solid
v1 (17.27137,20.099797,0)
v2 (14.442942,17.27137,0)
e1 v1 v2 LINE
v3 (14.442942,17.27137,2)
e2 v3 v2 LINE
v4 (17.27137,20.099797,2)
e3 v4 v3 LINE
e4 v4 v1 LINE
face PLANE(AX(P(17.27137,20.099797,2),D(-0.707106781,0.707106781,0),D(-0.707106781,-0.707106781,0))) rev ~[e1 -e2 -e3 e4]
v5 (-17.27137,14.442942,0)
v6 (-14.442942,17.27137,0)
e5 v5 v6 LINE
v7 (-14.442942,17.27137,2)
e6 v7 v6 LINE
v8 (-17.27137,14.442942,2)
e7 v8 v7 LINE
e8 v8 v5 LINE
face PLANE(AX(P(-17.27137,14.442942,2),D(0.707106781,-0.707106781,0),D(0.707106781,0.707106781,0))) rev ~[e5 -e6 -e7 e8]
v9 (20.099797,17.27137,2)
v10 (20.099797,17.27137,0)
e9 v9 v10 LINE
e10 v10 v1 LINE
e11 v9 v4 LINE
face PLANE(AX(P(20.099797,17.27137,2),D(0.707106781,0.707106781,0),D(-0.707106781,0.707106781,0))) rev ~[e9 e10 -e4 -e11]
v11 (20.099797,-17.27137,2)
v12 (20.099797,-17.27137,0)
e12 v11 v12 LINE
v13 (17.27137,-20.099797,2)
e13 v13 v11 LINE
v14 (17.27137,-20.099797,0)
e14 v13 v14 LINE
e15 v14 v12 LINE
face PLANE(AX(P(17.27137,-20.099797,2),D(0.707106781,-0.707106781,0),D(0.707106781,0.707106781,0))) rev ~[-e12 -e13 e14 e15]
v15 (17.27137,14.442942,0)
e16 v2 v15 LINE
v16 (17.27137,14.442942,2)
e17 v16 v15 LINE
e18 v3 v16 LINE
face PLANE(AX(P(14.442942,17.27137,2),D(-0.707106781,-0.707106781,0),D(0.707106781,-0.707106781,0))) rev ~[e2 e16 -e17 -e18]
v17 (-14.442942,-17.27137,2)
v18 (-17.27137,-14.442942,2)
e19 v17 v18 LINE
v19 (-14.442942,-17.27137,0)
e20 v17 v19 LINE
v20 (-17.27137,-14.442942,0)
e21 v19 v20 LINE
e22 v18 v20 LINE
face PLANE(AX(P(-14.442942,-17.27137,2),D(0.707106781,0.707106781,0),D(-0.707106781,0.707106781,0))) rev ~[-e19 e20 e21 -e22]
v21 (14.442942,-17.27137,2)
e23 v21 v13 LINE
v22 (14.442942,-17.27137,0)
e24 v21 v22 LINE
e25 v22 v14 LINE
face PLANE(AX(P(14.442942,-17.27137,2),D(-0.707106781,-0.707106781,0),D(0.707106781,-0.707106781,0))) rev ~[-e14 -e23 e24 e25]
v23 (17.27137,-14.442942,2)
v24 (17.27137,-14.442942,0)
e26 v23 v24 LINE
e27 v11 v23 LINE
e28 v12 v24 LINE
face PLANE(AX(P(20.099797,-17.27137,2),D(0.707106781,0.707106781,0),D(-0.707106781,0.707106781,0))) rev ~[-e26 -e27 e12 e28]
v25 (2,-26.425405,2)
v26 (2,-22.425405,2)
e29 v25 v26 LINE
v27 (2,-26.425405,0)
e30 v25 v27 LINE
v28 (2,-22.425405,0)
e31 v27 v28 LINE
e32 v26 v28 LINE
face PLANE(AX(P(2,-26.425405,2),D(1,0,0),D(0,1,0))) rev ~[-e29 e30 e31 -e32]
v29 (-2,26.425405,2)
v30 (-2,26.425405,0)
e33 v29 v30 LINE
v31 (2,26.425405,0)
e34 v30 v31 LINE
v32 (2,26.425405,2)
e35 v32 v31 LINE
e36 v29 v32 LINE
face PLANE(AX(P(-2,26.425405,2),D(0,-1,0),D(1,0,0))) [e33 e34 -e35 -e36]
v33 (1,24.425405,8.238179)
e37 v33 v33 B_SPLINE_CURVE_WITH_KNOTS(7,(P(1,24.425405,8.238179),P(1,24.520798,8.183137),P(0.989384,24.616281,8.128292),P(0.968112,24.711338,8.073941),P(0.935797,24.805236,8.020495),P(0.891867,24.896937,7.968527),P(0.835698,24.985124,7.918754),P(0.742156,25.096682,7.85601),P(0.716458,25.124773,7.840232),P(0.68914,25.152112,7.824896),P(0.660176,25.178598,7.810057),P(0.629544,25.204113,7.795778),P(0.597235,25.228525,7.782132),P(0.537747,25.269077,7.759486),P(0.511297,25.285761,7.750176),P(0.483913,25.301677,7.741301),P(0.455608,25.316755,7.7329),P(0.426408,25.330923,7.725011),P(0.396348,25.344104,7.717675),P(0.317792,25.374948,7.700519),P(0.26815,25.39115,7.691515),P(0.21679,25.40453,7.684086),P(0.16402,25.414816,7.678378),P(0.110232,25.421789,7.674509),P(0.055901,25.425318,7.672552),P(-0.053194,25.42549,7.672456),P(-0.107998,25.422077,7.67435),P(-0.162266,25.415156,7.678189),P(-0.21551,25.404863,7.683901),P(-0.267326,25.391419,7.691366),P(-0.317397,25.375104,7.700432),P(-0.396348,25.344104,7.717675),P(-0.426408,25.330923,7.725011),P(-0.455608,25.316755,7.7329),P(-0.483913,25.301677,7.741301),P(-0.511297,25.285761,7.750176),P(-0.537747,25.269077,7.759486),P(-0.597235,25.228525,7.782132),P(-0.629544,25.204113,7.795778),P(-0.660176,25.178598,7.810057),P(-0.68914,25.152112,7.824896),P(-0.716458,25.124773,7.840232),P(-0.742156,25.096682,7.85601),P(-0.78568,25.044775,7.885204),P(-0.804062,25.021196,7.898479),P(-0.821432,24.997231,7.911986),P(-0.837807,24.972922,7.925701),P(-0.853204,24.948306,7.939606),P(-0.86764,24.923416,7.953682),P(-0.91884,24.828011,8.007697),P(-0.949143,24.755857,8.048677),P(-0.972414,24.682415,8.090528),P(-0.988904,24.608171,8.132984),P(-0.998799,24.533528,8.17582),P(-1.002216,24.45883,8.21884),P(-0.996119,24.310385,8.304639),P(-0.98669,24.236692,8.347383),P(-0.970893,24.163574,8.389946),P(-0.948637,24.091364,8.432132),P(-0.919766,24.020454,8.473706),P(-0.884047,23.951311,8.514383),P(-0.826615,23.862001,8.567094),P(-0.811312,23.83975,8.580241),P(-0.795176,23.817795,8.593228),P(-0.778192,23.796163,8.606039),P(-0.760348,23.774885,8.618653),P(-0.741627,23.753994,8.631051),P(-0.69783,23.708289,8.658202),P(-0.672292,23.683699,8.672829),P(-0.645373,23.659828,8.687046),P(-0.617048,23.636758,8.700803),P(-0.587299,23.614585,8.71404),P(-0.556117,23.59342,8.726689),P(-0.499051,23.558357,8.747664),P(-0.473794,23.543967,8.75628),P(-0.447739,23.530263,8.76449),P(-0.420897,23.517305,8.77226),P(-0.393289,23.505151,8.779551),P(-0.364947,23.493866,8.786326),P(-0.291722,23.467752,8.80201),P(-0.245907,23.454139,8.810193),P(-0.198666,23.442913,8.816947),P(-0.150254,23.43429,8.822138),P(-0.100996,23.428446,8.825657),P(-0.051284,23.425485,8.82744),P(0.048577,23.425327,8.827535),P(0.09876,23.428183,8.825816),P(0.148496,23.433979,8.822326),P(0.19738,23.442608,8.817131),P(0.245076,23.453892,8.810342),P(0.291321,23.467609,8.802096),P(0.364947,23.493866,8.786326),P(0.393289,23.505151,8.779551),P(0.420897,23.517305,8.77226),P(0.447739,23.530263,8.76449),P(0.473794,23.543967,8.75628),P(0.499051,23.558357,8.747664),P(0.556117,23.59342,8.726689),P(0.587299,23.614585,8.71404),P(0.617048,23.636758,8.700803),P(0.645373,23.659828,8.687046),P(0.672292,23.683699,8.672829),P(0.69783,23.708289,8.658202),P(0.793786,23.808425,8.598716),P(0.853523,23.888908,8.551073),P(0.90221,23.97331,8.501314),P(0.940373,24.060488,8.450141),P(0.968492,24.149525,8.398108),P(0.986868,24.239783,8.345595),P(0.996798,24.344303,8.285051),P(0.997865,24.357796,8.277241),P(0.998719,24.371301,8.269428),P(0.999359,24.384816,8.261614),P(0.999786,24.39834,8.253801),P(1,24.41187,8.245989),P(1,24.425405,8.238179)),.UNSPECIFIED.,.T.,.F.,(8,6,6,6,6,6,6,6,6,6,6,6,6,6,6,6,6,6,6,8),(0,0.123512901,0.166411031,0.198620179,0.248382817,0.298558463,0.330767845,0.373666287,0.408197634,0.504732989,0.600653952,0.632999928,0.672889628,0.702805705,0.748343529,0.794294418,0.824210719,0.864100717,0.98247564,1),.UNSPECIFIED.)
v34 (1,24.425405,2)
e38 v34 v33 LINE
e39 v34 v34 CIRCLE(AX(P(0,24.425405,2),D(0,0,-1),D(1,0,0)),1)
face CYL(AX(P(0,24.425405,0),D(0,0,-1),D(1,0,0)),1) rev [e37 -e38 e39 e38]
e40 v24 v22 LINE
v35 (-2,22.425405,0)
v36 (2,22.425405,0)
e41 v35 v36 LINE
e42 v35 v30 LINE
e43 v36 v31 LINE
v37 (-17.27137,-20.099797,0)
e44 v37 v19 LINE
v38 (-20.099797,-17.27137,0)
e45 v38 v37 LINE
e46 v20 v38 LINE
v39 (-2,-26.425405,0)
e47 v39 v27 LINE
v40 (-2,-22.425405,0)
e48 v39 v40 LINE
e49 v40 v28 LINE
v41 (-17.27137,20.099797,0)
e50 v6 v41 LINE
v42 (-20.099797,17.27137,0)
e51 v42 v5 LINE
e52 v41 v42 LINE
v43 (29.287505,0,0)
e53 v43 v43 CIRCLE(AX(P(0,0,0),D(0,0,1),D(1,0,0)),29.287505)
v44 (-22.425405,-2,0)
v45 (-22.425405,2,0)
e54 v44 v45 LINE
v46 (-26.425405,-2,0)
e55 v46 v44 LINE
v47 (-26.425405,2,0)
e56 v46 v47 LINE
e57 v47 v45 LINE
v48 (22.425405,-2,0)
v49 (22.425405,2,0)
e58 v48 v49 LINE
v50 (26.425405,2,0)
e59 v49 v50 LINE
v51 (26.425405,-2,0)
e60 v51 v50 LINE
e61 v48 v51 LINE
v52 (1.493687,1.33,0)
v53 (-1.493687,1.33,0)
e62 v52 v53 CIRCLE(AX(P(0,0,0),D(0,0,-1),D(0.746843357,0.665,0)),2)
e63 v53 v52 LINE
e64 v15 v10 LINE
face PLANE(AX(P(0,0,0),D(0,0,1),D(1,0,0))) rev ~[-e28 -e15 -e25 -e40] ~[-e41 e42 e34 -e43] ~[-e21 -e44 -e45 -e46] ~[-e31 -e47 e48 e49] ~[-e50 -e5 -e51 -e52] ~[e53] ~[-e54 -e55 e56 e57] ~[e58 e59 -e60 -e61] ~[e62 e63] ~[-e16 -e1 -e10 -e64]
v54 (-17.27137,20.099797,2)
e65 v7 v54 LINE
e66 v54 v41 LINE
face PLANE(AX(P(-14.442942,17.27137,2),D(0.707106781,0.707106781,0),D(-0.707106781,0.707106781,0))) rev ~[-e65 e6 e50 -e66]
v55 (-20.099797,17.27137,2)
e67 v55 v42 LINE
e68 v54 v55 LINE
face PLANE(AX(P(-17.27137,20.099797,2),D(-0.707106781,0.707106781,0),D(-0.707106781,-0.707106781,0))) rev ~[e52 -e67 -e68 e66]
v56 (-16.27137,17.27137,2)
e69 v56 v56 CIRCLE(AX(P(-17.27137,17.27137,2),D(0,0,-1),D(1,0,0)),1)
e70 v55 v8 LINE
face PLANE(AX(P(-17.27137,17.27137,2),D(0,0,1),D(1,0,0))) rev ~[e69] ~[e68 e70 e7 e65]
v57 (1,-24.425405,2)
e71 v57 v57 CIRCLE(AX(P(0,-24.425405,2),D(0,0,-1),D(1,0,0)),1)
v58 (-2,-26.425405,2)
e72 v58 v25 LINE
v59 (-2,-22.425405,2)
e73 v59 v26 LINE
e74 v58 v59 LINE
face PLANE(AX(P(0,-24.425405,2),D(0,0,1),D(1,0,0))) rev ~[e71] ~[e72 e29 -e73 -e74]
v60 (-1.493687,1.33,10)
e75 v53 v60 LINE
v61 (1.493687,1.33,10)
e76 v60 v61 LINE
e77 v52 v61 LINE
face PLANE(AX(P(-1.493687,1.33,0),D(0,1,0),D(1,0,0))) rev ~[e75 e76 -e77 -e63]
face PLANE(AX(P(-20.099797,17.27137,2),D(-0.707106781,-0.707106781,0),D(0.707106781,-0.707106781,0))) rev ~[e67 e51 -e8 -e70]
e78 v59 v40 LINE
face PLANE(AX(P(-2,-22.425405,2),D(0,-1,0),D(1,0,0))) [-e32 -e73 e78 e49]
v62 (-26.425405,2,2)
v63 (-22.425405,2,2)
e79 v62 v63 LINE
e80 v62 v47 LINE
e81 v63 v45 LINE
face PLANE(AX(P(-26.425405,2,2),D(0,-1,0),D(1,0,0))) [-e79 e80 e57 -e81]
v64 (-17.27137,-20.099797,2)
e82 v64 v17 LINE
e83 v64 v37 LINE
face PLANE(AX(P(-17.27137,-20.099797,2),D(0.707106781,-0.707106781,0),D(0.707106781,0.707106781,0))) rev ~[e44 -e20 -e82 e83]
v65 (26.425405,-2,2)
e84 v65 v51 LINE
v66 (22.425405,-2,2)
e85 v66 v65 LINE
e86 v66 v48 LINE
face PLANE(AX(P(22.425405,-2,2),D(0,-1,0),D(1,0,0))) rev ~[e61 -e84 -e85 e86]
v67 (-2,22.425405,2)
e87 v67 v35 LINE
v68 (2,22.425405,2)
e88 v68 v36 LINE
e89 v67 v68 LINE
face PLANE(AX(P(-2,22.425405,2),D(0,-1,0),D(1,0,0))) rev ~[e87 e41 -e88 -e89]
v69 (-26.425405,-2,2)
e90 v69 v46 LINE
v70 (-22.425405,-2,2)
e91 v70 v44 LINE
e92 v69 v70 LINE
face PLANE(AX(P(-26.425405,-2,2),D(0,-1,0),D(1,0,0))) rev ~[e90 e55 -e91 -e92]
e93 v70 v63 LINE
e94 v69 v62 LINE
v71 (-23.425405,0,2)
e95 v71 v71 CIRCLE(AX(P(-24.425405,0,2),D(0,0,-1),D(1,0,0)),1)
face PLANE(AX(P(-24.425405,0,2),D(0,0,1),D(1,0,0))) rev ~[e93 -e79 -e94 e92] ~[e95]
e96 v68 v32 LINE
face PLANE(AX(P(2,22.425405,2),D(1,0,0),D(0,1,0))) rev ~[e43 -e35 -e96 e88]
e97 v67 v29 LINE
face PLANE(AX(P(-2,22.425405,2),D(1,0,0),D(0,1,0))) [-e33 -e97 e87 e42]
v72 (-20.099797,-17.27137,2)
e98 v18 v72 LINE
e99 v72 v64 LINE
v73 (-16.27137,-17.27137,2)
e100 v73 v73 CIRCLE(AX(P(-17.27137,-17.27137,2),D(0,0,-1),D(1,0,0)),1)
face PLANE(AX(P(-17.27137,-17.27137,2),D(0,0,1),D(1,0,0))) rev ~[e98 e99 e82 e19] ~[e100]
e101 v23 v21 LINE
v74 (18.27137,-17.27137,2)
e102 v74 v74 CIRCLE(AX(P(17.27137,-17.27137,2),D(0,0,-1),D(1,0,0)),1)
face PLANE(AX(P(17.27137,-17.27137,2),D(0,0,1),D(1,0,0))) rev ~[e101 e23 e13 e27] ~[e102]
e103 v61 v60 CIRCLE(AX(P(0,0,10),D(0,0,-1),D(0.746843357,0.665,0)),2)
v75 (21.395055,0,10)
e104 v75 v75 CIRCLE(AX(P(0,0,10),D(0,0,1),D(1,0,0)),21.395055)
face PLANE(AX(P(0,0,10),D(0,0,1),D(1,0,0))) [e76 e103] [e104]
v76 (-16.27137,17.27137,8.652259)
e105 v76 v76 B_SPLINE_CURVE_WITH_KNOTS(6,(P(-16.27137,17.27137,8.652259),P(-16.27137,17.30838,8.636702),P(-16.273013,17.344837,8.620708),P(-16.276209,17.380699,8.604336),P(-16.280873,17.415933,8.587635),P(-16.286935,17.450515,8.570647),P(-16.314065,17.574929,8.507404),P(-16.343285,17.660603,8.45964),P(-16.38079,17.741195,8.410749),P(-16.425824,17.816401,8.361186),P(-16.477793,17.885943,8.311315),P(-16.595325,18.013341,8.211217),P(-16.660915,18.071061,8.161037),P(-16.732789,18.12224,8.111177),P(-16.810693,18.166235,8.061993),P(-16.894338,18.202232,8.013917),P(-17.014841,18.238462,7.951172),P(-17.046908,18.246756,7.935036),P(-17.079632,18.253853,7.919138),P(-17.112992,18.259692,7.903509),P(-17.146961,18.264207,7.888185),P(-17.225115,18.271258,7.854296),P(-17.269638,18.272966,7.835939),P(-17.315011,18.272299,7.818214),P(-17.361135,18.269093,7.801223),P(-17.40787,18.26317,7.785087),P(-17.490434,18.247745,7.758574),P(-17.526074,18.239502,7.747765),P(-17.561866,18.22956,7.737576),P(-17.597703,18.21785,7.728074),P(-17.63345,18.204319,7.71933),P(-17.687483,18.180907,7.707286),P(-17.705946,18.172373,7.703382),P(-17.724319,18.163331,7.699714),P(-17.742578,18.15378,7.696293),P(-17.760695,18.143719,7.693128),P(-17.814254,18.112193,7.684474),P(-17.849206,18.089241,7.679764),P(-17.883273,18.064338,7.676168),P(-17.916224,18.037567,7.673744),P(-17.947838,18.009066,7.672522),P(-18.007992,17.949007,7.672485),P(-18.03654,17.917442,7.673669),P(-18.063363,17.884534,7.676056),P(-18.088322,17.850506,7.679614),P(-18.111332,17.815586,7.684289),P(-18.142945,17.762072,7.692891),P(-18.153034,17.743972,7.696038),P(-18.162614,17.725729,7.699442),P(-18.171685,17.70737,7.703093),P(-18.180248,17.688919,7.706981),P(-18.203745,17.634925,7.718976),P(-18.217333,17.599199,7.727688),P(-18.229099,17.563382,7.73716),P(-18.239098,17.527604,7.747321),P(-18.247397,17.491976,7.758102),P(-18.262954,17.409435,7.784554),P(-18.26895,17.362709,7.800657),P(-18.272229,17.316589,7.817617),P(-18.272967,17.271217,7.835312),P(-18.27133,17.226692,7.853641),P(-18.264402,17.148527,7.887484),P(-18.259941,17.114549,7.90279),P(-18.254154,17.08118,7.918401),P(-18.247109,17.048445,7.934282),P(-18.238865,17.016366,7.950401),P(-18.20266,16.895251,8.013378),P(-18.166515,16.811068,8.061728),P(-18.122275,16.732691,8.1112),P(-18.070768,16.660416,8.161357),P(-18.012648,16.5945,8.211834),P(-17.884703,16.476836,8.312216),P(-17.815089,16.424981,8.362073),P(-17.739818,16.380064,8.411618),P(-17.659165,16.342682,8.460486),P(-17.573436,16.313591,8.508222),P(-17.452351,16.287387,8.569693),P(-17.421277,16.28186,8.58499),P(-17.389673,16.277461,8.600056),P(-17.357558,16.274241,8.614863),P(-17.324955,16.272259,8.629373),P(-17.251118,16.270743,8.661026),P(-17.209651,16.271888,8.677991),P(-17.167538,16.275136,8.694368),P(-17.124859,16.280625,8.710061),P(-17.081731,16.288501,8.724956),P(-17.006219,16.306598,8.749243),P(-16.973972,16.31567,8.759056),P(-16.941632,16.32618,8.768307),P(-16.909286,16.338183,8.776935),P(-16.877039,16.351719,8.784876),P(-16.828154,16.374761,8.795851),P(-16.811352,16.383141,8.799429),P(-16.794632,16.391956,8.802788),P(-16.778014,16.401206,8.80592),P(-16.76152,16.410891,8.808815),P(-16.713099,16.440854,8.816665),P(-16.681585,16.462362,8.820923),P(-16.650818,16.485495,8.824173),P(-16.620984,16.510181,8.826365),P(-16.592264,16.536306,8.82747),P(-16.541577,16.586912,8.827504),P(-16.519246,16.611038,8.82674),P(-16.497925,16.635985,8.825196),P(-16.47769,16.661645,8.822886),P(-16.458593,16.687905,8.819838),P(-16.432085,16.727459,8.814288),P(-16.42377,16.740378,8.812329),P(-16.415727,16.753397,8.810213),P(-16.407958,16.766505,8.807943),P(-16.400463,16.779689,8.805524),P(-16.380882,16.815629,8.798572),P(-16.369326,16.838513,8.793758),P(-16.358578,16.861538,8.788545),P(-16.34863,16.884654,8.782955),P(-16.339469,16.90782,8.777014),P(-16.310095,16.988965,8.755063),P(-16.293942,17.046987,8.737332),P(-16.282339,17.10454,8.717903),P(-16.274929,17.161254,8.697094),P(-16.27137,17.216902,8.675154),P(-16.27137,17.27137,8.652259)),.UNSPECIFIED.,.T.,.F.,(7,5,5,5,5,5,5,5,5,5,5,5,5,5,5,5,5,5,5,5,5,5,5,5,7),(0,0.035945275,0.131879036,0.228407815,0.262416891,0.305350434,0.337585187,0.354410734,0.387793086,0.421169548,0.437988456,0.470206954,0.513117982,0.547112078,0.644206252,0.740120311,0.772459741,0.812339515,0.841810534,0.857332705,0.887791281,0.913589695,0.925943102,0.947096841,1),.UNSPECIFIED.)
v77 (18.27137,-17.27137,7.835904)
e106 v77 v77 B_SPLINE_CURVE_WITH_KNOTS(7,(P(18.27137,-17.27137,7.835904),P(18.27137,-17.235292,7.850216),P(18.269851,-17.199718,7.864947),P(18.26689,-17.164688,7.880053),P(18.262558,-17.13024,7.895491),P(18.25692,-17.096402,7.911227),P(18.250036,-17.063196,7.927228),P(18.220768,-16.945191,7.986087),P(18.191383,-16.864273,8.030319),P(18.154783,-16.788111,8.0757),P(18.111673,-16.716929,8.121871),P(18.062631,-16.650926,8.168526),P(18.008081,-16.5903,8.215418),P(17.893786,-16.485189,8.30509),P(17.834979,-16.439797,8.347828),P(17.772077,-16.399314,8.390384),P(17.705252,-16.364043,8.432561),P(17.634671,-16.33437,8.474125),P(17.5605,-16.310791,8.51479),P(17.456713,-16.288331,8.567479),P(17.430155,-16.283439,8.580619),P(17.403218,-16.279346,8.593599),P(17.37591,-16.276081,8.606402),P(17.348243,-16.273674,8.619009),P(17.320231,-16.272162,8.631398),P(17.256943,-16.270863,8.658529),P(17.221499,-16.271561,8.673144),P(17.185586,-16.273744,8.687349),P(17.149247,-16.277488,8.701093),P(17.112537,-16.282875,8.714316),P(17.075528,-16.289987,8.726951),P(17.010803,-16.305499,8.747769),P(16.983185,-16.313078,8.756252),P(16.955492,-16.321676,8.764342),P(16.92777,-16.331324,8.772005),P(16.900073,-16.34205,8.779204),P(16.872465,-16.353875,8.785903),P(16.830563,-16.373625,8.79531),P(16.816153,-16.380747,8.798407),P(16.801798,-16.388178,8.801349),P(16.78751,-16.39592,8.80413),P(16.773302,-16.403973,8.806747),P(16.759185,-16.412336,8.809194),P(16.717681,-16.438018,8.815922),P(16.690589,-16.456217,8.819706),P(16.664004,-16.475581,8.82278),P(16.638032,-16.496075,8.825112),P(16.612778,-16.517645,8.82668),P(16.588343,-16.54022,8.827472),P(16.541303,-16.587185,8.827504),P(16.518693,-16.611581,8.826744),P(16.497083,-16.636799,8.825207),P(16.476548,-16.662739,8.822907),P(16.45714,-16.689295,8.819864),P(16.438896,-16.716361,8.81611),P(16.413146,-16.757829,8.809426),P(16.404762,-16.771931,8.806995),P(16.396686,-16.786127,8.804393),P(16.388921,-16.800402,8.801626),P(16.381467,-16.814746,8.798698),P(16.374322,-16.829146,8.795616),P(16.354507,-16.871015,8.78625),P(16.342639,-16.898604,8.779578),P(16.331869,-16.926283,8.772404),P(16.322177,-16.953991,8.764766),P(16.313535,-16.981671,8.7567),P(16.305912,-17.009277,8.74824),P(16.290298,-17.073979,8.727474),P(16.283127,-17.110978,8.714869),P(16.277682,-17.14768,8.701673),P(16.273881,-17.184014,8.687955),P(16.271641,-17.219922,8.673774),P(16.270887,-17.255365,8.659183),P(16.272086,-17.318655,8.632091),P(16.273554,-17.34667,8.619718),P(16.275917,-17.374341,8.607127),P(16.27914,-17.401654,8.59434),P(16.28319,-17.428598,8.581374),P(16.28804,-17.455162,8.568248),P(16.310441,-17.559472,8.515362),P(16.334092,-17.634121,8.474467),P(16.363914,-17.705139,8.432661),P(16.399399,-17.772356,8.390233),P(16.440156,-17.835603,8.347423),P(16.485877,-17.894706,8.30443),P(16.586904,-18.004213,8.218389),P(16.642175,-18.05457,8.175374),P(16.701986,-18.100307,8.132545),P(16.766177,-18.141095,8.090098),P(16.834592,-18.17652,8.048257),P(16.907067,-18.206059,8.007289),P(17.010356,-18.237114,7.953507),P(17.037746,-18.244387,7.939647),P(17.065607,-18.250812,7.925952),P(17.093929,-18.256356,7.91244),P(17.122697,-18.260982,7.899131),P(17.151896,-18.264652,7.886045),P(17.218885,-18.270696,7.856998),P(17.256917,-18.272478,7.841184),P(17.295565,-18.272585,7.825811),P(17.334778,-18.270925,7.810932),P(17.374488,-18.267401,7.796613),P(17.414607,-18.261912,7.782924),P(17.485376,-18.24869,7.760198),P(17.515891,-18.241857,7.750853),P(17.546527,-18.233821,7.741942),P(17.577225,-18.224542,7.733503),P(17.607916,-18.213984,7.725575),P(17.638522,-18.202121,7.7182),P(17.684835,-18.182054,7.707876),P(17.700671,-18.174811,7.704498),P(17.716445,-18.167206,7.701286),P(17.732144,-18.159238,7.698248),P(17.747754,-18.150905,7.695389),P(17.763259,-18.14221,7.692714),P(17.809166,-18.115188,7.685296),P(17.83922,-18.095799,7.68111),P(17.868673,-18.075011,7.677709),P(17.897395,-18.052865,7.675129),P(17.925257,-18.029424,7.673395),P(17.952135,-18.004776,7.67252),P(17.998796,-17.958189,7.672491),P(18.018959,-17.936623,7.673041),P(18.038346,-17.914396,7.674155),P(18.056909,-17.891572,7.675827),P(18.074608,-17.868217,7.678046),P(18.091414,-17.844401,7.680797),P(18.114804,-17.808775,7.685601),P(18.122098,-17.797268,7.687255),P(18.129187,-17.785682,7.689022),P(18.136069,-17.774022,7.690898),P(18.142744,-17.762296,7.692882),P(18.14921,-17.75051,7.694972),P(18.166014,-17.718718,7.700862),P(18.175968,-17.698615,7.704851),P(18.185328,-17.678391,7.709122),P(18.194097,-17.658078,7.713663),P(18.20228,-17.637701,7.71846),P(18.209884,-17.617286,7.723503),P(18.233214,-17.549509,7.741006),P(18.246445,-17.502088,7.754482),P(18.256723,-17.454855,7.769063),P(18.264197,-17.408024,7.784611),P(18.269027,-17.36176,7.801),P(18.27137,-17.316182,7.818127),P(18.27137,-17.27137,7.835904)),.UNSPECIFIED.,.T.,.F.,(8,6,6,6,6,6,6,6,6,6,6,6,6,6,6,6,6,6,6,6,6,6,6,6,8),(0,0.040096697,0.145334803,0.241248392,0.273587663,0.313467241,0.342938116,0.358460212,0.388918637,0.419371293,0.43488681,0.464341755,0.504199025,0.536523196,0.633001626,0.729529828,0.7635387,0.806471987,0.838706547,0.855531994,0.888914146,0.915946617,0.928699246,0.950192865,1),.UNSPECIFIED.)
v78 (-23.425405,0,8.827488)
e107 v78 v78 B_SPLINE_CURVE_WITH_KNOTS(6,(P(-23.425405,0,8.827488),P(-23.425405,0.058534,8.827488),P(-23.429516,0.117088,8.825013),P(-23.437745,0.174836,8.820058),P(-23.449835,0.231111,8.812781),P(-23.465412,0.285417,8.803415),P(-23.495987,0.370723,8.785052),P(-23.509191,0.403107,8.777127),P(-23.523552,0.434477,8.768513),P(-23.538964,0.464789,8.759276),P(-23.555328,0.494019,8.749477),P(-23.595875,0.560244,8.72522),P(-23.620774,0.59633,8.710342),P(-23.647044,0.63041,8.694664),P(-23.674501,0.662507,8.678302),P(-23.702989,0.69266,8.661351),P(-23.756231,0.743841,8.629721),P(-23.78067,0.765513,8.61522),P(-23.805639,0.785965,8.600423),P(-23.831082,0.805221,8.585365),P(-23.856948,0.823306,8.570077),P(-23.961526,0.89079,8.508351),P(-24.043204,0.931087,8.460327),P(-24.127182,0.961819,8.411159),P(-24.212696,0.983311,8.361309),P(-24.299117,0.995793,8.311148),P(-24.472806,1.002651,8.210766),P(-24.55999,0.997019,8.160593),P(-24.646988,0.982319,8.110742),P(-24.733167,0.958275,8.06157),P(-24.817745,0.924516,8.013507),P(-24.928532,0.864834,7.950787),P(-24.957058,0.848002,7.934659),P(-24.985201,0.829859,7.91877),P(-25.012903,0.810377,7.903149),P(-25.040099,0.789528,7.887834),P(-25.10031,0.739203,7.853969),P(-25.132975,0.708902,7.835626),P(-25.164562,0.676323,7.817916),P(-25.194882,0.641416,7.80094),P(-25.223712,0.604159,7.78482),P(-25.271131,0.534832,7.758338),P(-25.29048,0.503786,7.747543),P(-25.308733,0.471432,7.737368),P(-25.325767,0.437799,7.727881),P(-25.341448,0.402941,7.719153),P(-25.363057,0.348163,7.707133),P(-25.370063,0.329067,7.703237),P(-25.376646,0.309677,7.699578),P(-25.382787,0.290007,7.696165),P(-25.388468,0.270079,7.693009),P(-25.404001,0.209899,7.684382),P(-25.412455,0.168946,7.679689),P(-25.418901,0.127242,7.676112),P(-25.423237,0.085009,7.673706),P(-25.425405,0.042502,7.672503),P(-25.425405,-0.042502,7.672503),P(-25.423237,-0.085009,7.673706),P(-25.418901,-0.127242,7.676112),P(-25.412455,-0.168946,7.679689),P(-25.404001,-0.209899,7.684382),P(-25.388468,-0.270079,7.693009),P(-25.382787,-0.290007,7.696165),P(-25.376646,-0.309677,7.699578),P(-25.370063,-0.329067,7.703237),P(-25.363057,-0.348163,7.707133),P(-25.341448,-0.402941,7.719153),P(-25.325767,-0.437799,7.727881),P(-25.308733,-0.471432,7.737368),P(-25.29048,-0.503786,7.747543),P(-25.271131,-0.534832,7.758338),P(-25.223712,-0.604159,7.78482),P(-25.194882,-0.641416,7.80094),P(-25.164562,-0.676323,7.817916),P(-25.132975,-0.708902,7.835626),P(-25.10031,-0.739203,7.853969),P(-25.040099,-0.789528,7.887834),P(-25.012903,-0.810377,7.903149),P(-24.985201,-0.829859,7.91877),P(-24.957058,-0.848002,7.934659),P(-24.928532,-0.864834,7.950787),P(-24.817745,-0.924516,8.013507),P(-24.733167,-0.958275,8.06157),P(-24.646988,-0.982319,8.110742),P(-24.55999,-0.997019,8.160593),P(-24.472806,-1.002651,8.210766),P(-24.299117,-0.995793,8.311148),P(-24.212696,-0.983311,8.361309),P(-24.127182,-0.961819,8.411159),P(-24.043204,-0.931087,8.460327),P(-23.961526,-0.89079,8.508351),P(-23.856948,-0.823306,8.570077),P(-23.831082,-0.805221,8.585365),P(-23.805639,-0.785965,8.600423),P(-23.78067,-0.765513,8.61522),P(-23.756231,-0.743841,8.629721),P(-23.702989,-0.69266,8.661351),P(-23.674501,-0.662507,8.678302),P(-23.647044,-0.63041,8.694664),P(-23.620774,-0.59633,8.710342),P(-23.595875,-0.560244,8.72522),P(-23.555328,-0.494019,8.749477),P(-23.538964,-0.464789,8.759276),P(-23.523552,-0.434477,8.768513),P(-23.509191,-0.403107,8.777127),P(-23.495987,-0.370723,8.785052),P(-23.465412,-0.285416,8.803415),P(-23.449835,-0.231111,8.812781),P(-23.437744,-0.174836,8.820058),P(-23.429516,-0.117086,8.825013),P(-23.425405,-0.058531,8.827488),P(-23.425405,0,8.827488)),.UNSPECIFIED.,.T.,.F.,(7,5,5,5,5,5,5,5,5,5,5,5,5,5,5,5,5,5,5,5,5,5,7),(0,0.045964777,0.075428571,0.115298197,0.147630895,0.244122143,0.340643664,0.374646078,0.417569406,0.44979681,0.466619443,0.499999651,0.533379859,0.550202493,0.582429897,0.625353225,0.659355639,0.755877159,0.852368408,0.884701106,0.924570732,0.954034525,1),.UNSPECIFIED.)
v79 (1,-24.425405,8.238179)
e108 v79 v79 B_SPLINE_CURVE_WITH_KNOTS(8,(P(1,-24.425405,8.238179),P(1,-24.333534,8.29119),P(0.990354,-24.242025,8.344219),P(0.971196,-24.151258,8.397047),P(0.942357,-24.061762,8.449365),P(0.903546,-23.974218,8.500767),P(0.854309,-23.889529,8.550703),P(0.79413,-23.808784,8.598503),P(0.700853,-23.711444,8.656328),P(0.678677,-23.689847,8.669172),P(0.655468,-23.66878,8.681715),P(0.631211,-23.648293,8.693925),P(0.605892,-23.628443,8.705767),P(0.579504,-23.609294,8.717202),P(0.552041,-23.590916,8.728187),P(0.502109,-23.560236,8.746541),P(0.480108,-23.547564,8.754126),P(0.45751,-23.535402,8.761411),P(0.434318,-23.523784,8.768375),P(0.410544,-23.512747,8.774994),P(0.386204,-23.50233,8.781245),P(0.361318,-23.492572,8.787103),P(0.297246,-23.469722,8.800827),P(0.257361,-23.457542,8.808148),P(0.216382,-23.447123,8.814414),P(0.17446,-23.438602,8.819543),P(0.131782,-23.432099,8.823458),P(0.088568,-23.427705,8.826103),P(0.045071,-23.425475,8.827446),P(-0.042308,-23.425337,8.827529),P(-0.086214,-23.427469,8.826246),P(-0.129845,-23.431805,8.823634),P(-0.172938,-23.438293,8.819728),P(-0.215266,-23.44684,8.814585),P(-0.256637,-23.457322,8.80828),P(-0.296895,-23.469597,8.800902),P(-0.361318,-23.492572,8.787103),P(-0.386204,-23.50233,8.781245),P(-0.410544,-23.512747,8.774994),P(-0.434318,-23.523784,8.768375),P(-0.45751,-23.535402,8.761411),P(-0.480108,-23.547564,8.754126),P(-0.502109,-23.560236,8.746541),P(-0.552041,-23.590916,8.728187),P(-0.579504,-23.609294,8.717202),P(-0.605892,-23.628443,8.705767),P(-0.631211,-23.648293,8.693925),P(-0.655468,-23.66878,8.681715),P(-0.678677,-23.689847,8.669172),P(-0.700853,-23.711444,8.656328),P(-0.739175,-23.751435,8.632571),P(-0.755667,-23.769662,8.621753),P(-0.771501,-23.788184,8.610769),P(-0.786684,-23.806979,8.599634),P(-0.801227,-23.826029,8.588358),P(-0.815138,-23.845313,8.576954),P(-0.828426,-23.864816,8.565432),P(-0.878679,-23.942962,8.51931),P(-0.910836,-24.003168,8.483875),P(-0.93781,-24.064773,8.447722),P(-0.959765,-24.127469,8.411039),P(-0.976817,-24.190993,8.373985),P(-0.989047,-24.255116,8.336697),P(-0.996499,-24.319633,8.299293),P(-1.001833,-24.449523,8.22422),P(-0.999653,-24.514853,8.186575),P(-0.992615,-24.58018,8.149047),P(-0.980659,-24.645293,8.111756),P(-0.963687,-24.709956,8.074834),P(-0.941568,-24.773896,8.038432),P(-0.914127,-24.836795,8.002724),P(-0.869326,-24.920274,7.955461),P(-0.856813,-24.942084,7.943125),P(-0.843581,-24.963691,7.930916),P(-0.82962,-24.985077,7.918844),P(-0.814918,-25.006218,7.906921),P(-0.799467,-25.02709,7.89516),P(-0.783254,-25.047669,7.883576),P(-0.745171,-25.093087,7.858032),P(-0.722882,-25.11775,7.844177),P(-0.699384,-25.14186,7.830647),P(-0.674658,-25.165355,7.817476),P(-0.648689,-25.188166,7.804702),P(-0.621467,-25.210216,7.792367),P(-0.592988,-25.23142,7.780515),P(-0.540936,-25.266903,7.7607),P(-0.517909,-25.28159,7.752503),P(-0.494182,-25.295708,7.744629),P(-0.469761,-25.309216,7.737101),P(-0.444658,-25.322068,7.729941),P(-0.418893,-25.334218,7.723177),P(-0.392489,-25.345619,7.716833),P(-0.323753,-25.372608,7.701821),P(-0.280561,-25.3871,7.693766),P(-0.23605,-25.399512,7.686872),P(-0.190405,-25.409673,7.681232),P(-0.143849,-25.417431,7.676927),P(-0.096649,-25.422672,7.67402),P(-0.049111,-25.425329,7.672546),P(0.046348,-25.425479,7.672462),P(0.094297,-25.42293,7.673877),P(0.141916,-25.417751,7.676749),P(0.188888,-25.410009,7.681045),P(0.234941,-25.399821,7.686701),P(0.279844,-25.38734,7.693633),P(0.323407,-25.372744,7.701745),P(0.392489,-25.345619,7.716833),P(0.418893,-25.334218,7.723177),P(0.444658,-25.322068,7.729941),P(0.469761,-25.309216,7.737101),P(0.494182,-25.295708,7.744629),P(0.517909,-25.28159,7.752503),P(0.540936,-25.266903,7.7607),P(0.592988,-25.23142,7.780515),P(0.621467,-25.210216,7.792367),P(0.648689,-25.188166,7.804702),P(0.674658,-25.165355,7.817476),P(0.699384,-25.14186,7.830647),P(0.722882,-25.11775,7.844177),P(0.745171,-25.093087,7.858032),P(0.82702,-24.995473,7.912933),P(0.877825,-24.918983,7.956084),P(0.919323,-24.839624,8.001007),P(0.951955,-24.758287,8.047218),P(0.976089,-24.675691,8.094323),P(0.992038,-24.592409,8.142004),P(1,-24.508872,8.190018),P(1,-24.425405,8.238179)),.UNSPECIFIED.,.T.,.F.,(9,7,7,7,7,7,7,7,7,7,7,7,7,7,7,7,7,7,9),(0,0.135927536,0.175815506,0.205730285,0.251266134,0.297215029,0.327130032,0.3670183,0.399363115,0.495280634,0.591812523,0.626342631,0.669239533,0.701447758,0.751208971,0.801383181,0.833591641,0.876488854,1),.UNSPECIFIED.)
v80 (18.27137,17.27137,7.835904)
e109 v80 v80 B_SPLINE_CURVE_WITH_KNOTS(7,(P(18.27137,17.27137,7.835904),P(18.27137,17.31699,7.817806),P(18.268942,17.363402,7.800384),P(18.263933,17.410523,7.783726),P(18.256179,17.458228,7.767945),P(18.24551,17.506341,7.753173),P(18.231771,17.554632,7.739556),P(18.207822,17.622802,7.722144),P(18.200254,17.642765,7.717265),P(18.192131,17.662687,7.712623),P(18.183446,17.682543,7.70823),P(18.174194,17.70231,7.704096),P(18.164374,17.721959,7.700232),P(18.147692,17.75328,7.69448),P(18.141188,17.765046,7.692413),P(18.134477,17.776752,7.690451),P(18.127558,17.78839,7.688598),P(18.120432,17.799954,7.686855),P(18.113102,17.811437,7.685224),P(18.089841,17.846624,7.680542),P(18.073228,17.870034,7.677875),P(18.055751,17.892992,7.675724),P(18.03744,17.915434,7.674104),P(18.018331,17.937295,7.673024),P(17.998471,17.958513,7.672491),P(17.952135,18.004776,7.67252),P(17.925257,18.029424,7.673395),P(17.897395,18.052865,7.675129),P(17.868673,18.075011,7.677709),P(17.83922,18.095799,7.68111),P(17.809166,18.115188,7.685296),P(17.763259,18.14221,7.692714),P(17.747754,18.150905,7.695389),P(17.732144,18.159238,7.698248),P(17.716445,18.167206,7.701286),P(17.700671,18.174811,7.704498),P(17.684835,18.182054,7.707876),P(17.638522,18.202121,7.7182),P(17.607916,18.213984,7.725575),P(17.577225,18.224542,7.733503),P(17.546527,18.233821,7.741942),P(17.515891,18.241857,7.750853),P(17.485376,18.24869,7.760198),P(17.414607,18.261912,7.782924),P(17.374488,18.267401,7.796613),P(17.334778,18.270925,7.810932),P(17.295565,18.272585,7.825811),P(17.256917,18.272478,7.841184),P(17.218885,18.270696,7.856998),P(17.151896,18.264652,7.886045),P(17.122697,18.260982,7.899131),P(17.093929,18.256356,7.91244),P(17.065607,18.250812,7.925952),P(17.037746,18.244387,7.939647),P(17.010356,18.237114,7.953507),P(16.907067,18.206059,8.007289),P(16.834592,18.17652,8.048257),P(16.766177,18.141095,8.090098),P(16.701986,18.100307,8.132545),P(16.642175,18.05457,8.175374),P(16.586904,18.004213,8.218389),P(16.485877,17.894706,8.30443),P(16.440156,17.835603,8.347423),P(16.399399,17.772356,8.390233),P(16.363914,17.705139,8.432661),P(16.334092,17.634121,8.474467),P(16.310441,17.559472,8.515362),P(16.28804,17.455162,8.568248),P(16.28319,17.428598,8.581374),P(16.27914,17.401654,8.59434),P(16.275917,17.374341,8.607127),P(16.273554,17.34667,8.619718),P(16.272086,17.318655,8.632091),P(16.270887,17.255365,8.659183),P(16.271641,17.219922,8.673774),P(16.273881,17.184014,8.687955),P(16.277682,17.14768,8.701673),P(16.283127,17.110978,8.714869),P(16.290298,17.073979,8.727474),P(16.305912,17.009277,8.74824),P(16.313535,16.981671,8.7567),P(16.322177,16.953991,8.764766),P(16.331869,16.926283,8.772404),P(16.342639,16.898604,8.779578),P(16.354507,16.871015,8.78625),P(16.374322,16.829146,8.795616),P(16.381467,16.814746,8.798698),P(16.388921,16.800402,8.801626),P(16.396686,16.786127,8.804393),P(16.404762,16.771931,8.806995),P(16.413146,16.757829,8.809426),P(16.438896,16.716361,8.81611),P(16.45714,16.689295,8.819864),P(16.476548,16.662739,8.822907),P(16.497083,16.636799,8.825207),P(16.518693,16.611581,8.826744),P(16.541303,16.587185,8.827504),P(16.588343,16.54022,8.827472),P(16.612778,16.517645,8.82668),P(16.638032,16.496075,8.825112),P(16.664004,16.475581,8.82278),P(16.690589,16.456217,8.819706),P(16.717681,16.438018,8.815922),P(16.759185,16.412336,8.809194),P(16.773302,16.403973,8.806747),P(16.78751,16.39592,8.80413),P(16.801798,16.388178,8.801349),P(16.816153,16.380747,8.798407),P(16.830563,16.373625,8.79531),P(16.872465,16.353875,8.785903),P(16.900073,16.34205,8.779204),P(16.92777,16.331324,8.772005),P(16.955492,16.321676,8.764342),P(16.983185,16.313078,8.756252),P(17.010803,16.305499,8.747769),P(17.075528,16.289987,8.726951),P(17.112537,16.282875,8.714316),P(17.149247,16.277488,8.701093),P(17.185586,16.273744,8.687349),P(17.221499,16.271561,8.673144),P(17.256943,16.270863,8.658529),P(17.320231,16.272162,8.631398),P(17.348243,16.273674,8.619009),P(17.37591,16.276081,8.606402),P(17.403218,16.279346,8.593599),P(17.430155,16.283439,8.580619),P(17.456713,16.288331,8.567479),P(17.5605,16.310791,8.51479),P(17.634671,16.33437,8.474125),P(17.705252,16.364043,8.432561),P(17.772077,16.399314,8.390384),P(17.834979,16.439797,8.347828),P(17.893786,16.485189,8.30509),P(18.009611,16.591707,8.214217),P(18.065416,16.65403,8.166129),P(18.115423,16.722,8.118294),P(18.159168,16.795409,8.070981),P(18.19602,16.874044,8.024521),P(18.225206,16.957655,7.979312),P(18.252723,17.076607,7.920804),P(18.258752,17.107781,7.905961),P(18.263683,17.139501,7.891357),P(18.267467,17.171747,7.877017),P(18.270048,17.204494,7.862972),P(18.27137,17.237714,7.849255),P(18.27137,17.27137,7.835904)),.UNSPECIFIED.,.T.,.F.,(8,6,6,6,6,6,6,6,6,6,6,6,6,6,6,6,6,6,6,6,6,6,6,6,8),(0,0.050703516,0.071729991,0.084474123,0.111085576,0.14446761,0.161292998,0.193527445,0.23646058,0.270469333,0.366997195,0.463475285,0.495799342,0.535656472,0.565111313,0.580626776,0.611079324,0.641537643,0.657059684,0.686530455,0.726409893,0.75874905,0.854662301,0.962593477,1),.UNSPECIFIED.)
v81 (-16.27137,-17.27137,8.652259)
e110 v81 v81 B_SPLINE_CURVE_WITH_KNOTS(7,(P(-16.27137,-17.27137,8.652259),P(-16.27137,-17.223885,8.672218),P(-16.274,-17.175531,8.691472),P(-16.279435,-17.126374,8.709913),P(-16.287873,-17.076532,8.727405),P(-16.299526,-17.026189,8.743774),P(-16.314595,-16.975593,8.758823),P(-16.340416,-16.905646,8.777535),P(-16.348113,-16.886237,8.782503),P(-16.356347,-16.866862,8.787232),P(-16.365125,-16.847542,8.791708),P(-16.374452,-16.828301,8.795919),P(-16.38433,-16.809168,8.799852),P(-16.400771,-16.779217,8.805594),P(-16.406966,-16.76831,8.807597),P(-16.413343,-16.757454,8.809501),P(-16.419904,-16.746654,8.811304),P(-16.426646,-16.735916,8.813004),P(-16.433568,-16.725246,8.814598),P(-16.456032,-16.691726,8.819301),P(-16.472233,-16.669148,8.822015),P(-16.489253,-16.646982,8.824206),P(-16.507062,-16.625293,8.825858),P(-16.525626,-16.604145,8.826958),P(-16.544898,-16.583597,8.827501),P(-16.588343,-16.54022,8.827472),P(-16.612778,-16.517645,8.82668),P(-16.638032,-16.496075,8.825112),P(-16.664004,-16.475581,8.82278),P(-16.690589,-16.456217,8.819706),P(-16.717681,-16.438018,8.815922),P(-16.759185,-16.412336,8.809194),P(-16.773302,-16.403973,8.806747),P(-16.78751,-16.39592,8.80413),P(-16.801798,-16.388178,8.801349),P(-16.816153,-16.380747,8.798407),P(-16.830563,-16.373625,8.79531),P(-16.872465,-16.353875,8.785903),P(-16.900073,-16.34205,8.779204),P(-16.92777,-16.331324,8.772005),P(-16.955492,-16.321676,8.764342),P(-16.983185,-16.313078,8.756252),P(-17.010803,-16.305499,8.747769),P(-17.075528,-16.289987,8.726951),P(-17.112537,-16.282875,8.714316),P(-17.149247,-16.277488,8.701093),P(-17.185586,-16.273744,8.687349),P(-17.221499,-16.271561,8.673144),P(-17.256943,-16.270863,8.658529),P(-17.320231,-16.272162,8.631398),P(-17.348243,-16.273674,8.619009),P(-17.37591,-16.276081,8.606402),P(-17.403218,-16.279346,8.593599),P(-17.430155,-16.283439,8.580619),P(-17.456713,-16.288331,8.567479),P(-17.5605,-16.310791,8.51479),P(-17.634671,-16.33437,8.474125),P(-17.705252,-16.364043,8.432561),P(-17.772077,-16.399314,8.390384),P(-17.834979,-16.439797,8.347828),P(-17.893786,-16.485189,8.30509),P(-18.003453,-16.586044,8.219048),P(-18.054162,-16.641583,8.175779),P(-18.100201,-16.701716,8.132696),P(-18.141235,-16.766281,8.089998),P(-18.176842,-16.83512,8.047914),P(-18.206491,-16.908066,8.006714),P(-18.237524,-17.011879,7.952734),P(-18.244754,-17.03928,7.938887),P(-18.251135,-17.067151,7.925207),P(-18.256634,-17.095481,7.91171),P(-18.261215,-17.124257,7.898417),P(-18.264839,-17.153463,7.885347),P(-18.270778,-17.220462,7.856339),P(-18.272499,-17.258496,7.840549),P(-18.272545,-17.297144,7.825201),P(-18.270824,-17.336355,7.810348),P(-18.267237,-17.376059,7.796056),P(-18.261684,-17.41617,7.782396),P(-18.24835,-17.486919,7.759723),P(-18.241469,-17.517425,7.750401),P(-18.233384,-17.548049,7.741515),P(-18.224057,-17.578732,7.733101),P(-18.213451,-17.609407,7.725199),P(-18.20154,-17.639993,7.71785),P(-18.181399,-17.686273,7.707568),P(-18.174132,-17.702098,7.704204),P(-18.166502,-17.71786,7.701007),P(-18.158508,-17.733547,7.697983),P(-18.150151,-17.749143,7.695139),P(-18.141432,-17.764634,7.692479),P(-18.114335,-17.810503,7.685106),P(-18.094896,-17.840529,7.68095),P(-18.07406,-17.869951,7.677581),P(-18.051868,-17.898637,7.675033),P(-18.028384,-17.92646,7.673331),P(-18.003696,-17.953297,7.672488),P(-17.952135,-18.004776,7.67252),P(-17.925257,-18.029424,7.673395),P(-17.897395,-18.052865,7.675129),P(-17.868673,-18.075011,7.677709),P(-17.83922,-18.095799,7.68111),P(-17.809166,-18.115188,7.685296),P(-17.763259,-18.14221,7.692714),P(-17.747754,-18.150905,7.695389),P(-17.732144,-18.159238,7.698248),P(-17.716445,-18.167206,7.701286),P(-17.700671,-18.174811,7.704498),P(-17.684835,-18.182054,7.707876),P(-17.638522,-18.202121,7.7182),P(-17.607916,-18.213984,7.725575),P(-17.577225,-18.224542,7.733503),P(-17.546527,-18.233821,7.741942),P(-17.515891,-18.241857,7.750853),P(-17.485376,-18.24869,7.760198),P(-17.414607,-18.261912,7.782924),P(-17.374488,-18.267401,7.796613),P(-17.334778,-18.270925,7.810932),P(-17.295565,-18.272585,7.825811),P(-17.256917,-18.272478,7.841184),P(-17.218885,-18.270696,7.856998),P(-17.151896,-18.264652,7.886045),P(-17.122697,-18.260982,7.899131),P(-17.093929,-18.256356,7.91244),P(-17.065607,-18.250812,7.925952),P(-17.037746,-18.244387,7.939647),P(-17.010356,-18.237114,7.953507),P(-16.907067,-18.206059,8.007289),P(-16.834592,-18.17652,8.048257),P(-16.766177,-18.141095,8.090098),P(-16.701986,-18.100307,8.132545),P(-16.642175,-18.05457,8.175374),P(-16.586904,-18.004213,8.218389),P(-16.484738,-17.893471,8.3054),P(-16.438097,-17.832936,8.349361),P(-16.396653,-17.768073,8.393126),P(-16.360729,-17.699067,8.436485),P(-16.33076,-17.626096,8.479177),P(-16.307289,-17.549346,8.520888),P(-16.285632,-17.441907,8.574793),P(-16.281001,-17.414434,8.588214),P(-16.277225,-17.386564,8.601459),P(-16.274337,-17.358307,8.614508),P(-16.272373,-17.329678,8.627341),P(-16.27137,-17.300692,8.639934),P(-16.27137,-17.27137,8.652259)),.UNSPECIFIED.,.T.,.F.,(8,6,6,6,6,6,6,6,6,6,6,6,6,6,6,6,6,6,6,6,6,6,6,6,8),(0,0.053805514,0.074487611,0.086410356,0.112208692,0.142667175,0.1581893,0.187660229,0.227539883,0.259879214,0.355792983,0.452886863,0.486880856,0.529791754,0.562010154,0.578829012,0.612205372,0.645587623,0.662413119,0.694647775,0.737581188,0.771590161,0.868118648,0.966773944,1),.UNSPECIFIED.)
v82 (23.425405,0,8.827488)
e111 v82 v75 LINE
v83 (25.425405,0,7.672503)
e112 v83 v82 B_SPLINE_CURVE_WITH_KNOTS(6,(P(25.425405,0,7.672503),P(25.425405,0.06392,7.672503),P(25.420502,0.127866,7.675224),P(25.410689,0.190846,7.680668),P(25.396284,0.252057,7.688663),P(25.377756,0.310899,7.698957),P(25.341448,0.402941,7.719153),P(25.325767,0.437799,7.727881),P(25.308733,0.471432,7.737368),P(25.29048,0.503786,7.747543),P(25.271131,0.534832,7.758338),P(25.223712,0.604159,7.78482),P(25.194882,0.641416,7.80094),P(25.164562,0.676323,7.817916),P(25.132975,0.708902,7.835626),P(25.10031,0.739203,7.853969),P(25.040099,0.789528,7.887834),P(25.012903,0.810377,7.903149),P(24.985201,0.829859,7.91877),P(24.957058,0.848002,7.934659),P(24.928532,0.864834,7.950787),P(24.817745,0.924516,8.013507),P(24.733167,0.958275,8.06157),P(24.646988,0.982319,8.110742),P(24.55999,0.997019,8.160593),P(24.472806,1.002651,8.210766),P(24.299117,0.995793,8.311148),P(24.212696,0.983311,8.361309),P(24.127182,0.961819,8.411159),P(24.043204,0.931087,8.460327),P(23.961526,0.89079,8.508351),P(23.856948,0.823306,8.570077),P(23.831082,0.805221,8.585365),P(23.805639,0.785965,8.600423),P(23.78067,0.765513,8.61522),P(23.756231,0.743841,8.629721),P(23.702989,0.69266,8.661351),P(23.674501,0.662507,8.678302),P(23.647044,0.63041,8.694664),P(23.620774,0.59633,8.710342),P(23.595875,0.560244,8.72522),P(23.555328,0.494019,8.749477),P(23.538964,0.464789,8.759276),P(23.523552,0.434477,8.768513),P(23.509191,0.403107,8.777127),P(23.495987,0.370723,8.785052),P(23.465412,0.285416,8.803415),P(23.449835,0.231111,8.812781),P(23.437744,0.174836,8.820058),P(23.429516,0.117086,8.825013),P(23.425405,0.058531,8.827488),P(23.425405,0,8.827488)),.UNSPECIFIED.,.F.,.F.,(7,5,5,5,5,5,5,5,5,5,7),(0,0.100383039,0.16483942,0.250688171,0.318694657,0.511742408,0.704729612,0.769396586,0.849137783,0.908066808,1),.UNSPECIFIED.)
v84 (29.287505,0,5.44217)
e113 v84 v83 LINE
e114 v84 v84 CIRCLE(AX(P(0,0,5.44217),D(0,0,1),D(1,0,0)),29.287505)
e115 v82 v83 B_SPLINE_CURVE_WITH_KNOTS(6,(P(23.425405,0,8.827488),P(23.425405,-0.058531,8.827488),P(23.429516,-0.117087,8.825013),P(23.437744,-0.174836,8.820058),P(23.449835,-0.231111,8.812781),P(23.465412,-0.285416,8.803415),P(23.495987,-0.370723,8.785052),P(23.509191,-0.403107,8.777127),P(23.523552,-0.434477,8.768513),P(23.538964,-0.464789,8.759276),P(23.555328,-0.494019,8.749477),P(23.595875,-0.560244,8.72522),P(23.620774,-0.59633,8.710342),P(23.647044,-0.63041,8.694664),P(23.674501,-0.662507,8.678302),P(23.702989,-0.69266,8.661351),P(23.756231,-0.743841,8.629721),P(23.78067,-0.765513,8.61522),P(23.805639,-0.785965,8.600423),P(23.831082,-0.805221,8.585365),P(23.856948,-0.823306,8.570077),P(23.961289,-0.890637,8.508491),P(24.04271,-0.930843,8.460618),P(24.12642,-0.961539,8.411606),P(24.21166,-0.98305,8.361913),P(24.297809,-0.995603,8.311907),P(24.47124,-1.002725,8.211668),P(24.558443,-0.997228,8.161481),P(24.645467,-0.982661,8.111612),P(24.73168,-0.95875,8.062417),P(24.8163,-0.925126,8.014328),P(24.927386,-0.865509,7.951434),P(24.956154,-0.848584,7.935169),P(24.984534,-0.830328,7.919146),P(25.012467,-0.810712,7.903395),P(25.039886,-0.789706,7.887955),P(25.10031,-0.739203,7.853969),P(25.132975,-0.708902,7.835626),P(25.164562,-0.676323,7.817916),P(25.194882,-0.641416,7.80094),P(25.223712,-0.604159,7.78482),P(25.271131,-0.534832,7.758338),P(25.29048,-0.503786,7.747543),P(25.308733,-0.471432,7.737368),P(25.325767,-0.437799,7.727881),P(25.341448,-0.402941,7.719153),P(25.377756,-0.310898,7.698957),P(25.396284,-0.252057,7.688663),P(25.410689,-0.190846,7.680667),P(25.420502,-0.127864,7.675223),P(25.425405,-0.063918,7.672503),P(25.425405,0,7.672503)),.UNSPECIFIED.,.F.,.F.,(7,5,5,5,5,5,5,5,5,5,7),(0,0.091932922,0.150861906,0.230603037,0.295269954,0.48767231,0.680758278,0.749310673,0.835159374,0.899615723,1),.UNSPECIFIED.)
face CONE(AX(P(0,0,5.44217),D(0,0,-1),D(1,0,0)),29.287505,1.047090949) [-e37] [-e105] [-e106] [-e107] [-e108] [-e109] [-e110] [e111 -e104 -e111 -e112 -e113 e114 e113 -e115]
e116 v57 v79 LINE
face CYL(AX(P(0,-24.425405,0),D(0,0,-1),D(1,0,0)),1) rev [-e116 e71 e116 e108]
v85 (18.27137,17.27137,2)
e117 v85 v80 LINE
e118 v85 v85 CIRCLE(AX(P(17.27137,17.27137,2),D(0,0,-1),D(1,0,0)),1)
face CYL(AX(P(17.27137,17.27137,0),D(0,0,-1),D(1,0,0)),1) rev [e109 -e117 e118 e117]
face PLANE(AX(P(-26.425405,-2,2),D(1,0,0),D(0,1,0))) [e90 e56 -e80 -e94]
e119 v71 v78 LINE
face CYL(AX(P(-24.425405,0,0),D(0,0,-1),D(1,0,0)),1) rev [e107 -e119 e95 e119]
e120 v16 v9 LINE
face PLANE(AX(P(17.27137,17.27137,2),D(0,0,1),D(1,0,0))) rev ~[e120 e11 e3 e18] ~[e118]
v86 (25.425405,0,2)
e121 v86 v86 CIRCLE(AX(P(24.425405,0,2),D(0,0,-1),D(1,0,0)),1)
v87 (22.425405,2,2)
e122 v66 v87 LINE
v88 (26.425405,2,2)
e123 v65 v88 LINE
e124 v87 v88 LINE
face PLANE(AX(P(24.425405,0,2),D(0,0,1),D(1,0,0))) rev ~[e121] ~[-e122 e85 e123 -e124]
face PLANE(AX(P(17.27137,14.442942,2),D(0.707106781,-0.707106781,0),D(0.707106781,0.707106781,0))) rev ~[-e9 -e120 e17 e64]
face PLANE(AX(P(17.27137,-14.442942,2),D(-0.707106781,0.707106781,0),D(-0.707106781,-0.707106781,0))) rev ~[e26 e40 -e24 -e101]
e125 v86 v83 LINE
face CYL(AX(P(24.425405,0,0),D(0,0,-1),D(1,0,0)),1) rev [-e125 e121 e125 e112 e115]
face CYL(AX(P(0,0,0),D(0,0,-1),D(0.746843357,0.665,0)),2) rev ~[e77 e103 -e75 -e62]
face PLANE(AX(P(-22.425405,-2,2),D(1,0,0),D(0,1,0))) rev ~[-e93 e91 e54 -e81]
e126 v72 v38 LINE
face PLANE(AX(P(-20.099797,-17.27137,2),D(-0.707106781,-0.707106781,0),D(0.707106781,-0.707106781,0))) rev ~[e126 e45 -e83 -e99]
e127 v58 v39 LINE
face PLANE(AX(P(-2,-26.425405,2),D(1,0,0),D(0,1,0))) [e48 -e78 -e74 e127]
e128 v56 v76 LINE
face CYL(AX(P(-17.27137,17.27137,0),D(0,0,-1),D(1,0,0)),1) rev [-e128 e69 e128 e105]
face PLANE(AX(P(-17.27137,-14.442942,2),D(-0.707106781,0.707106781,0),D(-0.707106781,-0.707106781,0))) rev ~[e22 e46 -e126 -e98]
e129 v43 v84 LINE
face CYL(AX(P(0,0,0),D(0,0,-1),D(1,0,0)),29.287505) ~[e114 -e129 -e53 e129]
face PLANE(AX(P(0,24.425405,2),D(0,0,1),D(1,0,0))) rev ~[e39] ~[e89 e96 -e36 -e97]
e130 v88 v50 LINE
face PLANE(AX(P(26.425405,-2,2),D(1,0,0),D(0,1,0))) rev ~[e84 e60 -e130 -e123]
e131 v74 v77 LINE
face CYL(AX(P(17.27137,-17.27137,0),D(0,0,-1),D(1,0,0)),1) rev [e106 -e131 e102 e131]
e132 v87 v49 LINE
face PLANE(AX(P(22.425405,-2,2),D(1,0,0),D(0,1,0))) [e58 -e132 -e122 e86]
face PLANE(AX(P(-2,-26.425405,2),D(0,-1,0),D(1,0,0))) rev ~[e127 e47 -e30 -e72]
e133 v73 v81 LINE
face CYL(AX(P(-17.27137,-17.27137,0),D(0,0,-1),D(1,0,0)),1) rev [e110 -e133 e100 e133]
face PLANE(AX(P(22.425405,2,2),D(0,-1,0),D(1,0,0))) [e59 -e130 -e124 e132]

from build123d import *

# Parameters (mm, degrees)
F0_R     = 29.287505
F0_R_2   = 1
F1_DEPTH = 10
F4_W     = 4
F4_H     = 4
F4_R     = 1
F5_DEPTH = 2


# Not quite as in the source:
# - a fillet or chamfer that OpenCascade refuses, or shapes differently, is made with other operations: its cross-section is extruded or revolved along the edge and cut away or added


with BuildPart() as f1:
    # F0 (on Top) → F1 (new body)
    with BuildSketch(Plane.XY):
        Circle(F0_R)
        with Locations((-17.2713695087, -17.2713695087)):
            Circle(F0_R_2, mode=Mode.SUBTRACT)
        with Locations((0, -24.425405)):
            Circle(F0_R_2, mode=Mode.SUBTRACT)
        with Locations((-24.425405, 0)):
            Circle(F0_R_2, mode=Mode.SUBTRACT)
        with BuildLine():
            ThreePointArc((1.4936867141, 1.33), (0, -2), (-1.4936867141, 1.33))
            Line((-1.4936867141, 1.33), (1.4936867141, 1.33))
        make_face(mode=Mode.SUBTRACT)
        with Locations((17.2713695087, -17.2713695087)):
            Circle(F0_R_2, mode=Mode.SUBTRACT)
        with Locations((24.425405, 0)):
            Circle(F0_R_2, mode=Mode.SUBTRACT)
        with Locations((-17.2713695087, 17.2713695087)):
            Circle(F0_R_2, mode=Mode.SUBTRACT)
        with Locations((0, 24.425405)):
            Circle(F0_R_2, mode=Mode.SUBTRACT)
        with Locations((17.2713695087, 17.2713695087)):
            Circle(F0_R_2, mode=Mode.SUBTRACT)
    extrude(amount=F1_DEPTH)

    # F2: chamfer of 7.89245 x 4.55783 on 1 edges, made by hand

    # F2_s1 → F2_t2 (revolve, cut)
    with BuildSketch(Plane.XZ):
        Polygon((29.287505, 5.44217), (21.395055, 10), (29.287505, 10), align=None)
    revolve(axis=Axis((0, 0, 10), (0, 0, 1)), mode=Mode.SUBTRACT)

    # F4 (on offset) → F5 (cut)
    with BuildSketch(Plane.XY.offset(2)):
        with Locations((0, -24.425405)):
            Rectangle(F4_W, F4_H)
        with Locations((0, -24.425405)):
            Circle(F4_R, mode=Mode.SUBTRACT)
        Polygon((-20.0997966335, -17.2713695087), (-17.2713695087, -20.0997966335), (-14.442942384, -17.2713695087), (-17.2713695087, -14.442942384), align=None)
        Polygon((17.2713695087, -20.0997966335), (20.0997966335, -17.2713695087), (17.2713695087, -14.442942384), (14.442942384, -17.2713695087), align=None)
        with Locations((-24.425405, 0)):
            Rectangle(F4_W, F4_H)
        with Locations((24.425405, 0)):
            Rectangle(F4_W, F4_H)
        Polygon((-17.2713695087, 20.0997966335), (-20.0997966335, 17.2713695087), (-17.2713695087, 14.442942384), (-14.442942384, 17.2713695087), align=None)
        Polygon((20.0997966335, 17.2713695087), (17.2713695087, 20.0997966335), (14.442942384, 17.2713695087), (17.2713695087, 14.442942384), align=None)
        with Locations((0, 24.425405)):
            Rectangle(F4_W, F4_H)
        with Locations((0, -24.425405)):
            Circle(F4_R)
    extrude(amount=-F5_DEPTH, mode=Mode.SUBTRACT)


solid = f1.part
